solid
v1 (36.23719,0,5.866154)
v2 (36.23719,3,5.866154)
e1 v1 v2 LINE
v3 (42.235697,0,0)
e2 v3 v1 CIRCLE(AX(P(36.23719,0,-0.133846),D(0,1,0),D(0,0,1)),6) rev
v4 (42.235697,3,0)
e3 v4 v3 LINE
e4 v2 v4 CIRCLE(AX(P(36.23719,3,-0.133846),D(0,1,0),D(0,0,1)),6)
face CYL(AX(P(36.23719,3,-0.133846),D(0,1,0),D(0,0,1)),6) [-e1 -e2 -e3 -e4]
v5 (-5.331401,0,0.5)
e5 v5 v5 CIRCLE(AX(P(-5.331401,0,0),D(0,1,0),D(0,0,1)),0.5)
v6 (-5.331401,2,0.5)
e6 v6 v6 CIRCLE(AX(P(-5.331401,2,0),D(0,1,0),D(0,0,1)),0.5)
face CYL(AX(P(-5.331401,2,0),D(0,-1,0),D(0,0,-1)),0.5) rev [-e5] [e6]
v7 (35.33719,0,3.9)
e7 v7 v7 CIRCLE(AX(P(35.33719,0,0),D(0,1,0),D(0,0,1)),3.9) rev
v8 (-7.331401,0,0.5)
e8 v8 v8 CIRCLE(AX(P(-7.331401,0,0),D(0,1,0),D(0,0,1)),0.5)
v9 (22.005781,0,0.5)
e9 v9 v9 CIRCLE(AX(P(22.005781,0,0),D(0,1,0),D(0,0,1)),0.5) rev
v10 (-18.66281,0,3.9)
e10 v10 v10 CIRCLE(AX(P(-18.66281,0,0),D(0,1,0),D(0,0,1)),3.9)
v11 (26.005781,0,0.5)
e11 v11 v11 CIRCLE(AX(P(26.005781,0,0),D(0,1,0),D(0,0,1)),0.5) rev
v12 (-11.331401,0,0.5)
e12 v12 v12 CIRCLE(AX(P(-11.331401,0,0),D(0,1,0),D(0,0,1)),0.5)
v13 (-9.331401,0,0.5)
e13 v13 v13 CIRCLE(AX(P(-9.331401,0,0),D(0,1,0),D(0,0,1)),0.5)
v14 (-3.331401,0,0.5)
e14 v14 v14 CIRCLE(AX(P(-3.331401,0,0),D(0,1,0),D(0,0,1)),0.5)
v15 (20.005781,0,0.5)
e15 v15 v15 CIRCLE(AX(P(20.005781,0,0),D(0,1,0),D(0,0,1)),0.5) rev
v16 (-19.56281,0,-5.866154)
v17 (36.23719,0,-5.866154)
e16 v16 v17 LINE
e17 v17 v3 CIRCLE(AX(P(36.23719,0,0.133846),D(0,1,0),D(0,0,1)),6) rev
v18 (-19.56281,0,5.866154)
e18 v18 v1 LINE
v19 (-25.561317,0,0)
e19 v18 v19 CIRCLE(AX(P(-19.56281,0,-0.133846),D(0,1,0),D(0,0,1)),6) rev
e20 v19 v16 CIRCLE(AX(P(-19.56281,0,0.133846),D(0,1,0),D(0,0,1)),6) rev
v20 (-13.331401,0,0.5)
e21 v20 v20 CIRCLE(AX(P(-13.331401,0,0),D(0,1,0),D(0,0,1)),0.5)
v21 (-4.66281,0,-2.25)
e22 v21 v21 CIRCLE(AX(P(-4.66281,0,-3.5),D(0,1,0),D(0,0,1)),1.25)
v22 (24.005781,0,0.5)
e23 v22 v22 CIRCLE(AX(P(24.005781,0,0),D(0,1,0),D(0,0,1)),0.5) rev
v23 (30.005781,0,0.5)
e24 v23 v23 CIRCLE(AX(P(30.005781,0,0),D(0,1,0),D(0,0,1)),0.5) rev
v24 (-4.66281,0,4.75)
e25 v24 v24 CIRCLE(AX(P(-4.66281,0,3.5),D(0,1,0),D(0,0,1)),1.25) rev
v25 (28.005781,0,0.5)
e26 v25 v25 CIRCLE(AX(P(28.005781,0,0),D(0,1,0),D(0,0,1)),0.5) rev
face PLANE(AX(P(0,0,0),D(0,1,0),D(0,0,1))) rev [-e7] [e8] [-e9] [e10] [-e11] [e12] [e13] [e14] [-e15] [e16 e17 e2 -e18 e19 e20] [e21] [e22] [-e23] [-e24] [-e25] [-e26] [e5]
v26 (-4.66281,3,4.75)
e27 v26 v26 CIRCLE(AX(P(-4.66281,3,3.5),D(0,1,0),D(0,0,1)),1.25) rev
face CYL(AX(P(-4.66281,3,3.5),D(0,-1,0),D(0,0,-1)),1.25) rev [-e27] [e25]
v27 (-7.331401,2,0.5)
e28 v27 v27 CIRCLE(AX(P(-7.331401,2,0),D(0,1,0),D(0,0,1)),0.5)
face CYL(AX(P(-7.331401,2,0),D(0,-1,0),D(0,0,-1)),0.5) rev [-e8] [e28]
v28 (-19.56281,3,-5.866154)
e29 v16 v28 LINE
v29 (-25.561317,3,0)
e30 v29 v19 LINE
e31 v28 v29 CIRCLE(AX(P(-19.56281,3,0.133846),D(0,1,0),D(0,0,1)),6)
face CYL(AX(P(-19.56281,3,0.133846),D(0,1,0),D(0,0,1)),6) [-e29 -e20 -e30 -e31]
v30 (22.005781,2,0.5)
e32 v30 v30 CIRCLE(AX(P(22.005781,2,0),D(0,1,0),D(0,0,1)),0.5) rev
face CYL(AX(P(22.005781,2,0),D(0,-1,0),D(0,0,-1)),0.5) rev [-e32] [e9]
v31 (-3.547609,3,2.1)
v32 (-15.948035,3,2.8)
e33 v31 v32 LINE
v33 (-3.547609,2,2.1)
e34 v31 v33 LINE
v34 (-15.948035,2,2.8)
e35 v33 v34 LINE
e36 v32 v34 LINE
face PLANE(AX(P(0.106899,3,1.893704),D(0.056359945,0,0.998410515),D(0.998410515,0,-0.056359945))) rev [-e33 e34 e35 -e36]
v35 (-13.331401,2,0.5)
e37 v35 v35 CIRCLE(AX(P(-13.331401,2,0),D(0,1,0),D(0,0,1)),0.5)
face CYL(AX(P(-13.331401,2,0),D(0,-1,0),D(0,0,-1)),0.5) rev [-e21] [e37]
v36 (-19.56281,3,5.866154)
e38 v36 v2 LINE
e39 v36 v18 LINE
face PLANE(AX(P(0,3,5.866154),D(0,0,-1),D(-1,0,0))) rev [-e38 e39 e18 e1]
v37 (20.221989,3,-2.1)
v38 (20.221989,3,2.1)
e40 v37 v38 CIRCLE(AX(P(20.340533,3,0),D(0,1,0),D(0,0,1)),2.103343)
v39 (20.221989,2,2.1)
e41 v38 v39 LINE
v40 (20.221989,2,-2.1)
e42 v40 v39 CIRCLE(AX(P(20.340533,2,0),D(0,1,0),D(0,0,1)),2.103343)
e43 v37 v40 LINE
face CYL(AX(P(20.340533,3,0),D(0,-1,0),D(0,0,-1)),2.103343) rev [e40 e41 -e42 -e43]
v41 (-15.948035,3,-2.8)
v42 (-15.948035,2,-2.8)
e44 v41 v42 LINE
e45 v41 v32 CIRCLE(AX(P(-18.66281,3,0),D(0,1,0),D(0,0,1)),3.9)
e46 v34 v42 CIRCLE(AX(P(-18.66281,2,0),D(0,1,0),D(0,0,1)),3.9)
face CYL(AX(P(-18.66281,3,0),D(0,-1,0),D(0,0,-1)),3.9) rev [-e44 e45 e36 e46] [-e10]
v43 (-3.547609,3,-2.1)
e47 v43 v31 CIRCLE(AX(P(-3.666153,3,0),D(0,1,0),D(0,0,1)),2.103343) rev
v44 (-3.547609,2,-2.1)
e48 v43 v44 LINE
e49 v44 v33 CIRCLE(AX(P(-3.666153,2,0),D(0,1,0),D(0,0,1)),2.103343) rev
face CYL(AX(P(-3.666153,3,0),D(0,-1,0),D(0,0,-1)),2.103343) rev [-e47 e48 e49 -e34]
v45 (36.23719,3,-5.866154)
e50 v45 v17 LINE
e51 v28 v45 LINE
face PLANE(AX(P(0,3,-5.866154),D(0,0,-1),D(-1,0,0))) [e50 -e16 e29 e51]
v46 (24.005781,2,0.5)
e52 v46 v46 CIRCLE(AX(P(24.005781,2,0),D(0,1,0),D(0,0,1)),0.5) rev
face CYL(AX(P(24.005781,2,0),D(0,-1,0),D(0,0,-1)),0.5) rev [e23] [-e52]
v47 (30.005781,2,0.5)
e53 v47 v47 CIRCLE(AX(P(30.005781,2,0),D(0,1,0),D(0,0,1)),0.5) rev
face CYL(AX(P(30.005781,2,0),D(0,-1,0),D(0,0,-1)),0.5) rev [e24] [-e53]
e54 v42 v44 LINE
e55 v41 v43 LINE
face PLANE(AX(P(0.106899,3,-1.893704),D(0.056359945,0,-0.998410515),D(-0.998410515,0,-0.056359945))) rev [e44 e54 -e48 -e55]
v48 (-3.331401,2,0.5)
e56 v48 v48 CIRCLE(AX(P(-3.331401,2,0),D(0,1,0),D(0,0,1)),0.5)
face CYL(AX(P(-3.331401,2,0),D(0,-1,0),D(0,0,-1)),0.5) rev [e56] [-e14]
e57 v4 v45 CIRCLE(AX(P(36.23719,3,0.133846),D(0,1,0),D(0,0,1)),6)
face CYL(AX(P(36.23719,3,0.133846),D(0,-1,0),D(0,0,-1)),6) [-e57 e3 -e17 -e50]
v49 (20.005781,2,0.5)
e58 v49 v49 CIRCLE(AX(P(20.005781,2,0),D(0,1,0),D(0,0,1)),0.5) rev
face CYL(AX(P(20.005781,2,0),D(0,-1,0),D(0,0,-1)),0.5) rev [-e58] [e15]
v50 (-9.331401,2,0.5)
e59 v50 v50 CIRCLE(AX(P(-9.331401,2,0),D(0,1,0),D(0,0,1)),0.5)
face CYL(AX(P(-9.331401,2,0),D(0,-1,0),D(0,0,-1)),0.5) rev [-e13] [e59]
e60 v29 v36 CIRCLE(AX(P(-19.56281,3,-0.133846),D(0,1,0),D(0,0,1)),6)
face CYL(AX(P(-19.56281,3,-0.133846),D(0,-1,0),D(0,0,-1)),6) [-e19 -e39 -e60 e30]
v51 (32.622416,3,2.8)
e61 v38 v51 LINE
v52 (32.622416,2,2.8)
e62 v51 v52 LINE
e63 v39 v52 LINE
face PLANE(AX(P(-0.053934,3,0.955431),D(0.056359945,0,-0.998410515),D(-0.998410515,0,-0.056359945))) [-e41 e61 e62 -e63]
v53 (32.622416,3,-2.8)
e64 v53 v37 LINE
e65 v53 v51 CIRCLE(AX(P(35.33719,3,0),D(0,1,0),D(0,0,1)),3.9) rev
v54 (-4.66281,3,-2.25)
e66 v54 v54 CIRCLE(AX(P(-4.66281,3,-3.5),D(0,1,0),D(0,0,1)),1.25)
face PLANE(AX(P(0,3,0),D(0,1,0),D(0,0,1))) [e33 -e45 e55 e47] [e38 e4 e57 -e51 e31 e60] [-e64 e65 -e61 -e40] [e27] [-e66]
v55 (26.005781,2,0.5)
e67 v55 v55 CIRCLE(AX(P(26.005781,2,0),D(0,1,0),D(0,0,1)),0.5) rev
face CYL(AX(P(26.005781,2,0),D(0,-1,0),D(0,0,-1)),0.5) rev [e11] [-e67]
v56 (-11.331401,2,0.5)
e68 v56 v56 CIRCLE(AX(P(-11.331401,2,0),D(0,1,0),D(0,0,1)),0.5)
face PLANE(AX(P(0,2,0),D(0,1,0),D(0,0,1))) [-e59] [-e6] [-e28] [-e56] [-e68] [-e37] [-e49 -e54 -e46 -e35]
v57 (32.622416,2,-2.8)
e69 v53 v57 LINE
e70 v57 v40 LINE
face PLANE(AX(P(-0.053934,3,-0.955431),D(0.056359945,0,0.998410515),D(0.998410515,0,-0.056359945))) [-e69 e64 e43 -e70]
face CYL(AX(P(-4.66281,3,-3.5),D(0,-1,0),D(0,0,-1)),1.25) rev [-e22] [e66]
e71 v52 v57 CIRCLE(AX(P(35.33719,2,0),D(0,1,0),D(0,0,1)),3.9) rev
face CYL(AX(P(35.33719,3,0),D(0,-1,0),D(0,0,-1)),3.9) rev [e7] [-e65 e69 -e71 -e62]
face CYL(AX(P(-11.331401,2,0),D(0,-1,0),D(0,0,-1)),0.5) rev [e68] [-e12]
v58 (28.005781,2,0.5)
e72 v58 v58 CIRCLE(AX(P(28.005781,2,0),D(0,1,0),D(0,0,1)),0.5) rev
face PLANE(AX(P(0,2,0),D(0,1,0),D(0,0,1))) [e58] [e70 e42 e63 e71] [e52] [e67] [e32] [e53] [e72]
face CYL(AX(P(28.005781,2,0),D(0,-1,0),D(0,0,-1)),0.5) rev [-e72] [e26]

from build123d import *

# Parameters (mm, degrees)
SKETCH1_W           = 67.8
SKETCH1_H           = 11.732307158
SKETCH1_R           = 1.25
BOSS_EXTRUDE1_DEPTH = 3
SKETCH1_7_R         = 0.5
BOSS_EXTRUDE2_DEPTH = 2
FILLET1_R           = 6


with BuildPart() as part:
    # Sketch1 → Boss-Extrude1 (new body)
    with BuildSketch(Plane(origin=(0, 0, 0), x_dir=(1, 0, 0), z_dir=(0, 1, 0))):
        with Locations((8.337190195, 0)):
            Rectangle(SKETCH1_W, SKETCH1_H)
        with Locations(Location((-4.662809805, -3.5, 0), (0, 0, 270))):
            Circle(SKETCH1_R, mode=Mode.SUBTRACT)
        with BuildLine():
            ThreePointArc((-15.948035413, -2.8), (-22.562809805, 0), (-15.948035413, 2.8))
            Line((-15.948035413, 2.8), (-3.54760873, 2.1))
            ThreePointArc((-3.54760873, 2.1), (-1.562809805, 0), (-3.54760873, -2.1))
            Line((-3.54760873, -2.1), (-15.948035413, -2.8))
        make_face(mode=Mode.SUBTRACT)
        with Locations(Location((-4.662809805, 3.5, 0), (0, 0, 270))):
            Circle(SKETCH1_R, mode=Mode.SUBTRACT)
        with BuildLine():
            Line((32.622415803, -2.8), (20.221989119, -2.1))
            ThreePointArc((20.221989119, -2.1), (18.237190195, 0), (20.221989119, 2.1))
            Line((20.221989119, 2.1), (32.622415803, 2.8))
            ThreePointArc((32.622415803, 2.8), (36.85745002, 3.591491343), (39.237190195, 0))
            ThreePointArc((39.237190195, 0), (36.85745002, -3.591491343), (32.622415803, -2.8))
        make_face(mode=Mode.SUBTRACT)
    extrude(amount=BOSS_EXTRUDE1_DEPTH)

    # Sketch1<7> → Boss-Extrude2 (add)
    # profile 1 of 2: a face of its own
    with BuildSketch(Plane(origin=(0, 0, 0), x_dir=(1, 0, 0), z_dir=(0, 1, 0))):
        with BuildLine():
            Line((-3.54760873, 2.1), (-15.948035413, 2.8))
            ThreePointArc((-15.948035413, 2.8), (-15.071318463, 1.520259825), (-14.762809805, 0))
            ThreePointArc((-14.762809805, 0), (-15.071318463, -1.520259825), (-15.948035413, -2.8))
            Line((-15.948035413, -2.8), (-3.54760873, -2.1))
            ThreePointArc((-3.54760873, -2.1), (-1.562809805, 0), (-3.54760873, 2.1))
        make_face()
        with Locations(Location((-13.331400804, 0, 0), (0, 0, 270))):
            Circle(SKETCH1_7_R, mode=Mode.SUBTRACT)
        with Locations(Location((-11.331400804, 0, 0), (0, 0, 270))):
            Circle(SKETCH1_7_R, mode=Mode.SUBTRACT)
        with Locations(Location((-9.331400804, 0, 0), (0, 0, 270))):
            Circle(SKETCH1_7_R, mode=Mode.SUBTRACT)
        with Locations(Location((-7.331400804, 0, 0), (0, 0, 270))):
            Circle(SKETCH1_7_R, mode=Mode.SUBTRACT)
        with Locations(Location((-5.331400804, 0, 0), (0, 0, 270))):
            Circle(SKETCH1_7_R, mode=Mode.SUBTRACT)
        with Locations(Location((-3.331400804, 0, 0), (0, 0, 270))):
            Circle(SKETCH1_7_R, mode=Mode.SUBTRACT)
    # profile 2 of 2: a face of its own
    with BuildSketch(Plane(origin=(0, 0, 0), x_dir=(1, 0, 0), z_dir=(0, 1, 0))):
        with BuildLine():
            ThreePointArc((20.221989119, 2.1), (18.237190195, 0), (20.221989119, -2.1))
            Line((20.221989119, -2.1), (32.622415803, -2.8))
            ThreePointArc((32.622415803, -2.8), (31.437190195, 0), (32.622415803, 2.8))
            Line((32.622415803, 2.8), (20.221989119, 2.1))
        make_face()
        with Locations(Location((22.005781193, 0, 0), (0, 0, 270))):
            Circle(SKETCH1_7_R, mode=Mode.SUBTRACT)
        with Locations(Location((24.005781193, 0, 0), (0, 0, 270))):
            Circle(SKETCH1_7_R, mode=Mode.SUBTRACT)
        with Locations(Location((26.005781193, 0, 0), (0, 0, 270))):
            Circle(SKETCH1_7_R, mode=Mode.SUBTRACT)
        with Locations(Location((28.005781193, 0, 0), (0, 0, 270))):
            Circle(SKETCH1_7_R, mode=Mode.SUBTRACT)
        with Locations(Location((30.005781193, 0, 0), (0, 0, 270))):
            Circle(SKETCH1_7_R, mode=Mode.SUBTRACT)
        with Locations(Location((20.005781193, 0, 0), (0, 0, 270))):
            Circle(SKETCH1_7_R, mode=Mode.SUBTRACT)
    extrude(amount=BOSS_EXTRUDE2_DEPTH)

    # Fillet1
    # the kernel refuses this fillet: 6 mm, written as the material it takes off along each edge
    with BuildSketch(Plane(origin=(-25.562809805, -15, 5.866153579), x_dir=(1, 0, 0), z_dir=(0, 1, 0)), Plane(origin=(42.237190195, -15, -5.866153579), x_dir=(-1, 0, 0), z_dir=(0, 1, 0))) as fillet1_piece_1:
        with BuildLine():
            CenterArc((FILLET1_R, FILLET1_R), FILLET1_R, 180, 90)
            Line((0, FILLET1_R), (0, 0))
            Line((0, 0), (FILLET1_R, 0))
        make_face()
    extrude(amount=33, mode=Mode.SUBTRACT)
    with BuildSketch(Plane(origin=(-25.562809805, -15, -5.866153579), x_dir=(1, 0, 0), z_dir=(0, 1, 0)), Plane(origin=(42.237190195, -15, 5.866153579), x_dir=(-1, 0, 0), z_dir=(0, 1, 0))) as fillet1_piece_2:
        with BuildLine():
            CenterArc((FILLET1_R, -FILLET1_R), FILLET1_R, 90, 90)
            Line((0, -FILLET1_R), (0, 0))
            Line((0, 0), (FILLET1_R, 0))
        make_face()
    extrude(amount=33, mode=Mode.SUBTRACT)


solid = part.part
